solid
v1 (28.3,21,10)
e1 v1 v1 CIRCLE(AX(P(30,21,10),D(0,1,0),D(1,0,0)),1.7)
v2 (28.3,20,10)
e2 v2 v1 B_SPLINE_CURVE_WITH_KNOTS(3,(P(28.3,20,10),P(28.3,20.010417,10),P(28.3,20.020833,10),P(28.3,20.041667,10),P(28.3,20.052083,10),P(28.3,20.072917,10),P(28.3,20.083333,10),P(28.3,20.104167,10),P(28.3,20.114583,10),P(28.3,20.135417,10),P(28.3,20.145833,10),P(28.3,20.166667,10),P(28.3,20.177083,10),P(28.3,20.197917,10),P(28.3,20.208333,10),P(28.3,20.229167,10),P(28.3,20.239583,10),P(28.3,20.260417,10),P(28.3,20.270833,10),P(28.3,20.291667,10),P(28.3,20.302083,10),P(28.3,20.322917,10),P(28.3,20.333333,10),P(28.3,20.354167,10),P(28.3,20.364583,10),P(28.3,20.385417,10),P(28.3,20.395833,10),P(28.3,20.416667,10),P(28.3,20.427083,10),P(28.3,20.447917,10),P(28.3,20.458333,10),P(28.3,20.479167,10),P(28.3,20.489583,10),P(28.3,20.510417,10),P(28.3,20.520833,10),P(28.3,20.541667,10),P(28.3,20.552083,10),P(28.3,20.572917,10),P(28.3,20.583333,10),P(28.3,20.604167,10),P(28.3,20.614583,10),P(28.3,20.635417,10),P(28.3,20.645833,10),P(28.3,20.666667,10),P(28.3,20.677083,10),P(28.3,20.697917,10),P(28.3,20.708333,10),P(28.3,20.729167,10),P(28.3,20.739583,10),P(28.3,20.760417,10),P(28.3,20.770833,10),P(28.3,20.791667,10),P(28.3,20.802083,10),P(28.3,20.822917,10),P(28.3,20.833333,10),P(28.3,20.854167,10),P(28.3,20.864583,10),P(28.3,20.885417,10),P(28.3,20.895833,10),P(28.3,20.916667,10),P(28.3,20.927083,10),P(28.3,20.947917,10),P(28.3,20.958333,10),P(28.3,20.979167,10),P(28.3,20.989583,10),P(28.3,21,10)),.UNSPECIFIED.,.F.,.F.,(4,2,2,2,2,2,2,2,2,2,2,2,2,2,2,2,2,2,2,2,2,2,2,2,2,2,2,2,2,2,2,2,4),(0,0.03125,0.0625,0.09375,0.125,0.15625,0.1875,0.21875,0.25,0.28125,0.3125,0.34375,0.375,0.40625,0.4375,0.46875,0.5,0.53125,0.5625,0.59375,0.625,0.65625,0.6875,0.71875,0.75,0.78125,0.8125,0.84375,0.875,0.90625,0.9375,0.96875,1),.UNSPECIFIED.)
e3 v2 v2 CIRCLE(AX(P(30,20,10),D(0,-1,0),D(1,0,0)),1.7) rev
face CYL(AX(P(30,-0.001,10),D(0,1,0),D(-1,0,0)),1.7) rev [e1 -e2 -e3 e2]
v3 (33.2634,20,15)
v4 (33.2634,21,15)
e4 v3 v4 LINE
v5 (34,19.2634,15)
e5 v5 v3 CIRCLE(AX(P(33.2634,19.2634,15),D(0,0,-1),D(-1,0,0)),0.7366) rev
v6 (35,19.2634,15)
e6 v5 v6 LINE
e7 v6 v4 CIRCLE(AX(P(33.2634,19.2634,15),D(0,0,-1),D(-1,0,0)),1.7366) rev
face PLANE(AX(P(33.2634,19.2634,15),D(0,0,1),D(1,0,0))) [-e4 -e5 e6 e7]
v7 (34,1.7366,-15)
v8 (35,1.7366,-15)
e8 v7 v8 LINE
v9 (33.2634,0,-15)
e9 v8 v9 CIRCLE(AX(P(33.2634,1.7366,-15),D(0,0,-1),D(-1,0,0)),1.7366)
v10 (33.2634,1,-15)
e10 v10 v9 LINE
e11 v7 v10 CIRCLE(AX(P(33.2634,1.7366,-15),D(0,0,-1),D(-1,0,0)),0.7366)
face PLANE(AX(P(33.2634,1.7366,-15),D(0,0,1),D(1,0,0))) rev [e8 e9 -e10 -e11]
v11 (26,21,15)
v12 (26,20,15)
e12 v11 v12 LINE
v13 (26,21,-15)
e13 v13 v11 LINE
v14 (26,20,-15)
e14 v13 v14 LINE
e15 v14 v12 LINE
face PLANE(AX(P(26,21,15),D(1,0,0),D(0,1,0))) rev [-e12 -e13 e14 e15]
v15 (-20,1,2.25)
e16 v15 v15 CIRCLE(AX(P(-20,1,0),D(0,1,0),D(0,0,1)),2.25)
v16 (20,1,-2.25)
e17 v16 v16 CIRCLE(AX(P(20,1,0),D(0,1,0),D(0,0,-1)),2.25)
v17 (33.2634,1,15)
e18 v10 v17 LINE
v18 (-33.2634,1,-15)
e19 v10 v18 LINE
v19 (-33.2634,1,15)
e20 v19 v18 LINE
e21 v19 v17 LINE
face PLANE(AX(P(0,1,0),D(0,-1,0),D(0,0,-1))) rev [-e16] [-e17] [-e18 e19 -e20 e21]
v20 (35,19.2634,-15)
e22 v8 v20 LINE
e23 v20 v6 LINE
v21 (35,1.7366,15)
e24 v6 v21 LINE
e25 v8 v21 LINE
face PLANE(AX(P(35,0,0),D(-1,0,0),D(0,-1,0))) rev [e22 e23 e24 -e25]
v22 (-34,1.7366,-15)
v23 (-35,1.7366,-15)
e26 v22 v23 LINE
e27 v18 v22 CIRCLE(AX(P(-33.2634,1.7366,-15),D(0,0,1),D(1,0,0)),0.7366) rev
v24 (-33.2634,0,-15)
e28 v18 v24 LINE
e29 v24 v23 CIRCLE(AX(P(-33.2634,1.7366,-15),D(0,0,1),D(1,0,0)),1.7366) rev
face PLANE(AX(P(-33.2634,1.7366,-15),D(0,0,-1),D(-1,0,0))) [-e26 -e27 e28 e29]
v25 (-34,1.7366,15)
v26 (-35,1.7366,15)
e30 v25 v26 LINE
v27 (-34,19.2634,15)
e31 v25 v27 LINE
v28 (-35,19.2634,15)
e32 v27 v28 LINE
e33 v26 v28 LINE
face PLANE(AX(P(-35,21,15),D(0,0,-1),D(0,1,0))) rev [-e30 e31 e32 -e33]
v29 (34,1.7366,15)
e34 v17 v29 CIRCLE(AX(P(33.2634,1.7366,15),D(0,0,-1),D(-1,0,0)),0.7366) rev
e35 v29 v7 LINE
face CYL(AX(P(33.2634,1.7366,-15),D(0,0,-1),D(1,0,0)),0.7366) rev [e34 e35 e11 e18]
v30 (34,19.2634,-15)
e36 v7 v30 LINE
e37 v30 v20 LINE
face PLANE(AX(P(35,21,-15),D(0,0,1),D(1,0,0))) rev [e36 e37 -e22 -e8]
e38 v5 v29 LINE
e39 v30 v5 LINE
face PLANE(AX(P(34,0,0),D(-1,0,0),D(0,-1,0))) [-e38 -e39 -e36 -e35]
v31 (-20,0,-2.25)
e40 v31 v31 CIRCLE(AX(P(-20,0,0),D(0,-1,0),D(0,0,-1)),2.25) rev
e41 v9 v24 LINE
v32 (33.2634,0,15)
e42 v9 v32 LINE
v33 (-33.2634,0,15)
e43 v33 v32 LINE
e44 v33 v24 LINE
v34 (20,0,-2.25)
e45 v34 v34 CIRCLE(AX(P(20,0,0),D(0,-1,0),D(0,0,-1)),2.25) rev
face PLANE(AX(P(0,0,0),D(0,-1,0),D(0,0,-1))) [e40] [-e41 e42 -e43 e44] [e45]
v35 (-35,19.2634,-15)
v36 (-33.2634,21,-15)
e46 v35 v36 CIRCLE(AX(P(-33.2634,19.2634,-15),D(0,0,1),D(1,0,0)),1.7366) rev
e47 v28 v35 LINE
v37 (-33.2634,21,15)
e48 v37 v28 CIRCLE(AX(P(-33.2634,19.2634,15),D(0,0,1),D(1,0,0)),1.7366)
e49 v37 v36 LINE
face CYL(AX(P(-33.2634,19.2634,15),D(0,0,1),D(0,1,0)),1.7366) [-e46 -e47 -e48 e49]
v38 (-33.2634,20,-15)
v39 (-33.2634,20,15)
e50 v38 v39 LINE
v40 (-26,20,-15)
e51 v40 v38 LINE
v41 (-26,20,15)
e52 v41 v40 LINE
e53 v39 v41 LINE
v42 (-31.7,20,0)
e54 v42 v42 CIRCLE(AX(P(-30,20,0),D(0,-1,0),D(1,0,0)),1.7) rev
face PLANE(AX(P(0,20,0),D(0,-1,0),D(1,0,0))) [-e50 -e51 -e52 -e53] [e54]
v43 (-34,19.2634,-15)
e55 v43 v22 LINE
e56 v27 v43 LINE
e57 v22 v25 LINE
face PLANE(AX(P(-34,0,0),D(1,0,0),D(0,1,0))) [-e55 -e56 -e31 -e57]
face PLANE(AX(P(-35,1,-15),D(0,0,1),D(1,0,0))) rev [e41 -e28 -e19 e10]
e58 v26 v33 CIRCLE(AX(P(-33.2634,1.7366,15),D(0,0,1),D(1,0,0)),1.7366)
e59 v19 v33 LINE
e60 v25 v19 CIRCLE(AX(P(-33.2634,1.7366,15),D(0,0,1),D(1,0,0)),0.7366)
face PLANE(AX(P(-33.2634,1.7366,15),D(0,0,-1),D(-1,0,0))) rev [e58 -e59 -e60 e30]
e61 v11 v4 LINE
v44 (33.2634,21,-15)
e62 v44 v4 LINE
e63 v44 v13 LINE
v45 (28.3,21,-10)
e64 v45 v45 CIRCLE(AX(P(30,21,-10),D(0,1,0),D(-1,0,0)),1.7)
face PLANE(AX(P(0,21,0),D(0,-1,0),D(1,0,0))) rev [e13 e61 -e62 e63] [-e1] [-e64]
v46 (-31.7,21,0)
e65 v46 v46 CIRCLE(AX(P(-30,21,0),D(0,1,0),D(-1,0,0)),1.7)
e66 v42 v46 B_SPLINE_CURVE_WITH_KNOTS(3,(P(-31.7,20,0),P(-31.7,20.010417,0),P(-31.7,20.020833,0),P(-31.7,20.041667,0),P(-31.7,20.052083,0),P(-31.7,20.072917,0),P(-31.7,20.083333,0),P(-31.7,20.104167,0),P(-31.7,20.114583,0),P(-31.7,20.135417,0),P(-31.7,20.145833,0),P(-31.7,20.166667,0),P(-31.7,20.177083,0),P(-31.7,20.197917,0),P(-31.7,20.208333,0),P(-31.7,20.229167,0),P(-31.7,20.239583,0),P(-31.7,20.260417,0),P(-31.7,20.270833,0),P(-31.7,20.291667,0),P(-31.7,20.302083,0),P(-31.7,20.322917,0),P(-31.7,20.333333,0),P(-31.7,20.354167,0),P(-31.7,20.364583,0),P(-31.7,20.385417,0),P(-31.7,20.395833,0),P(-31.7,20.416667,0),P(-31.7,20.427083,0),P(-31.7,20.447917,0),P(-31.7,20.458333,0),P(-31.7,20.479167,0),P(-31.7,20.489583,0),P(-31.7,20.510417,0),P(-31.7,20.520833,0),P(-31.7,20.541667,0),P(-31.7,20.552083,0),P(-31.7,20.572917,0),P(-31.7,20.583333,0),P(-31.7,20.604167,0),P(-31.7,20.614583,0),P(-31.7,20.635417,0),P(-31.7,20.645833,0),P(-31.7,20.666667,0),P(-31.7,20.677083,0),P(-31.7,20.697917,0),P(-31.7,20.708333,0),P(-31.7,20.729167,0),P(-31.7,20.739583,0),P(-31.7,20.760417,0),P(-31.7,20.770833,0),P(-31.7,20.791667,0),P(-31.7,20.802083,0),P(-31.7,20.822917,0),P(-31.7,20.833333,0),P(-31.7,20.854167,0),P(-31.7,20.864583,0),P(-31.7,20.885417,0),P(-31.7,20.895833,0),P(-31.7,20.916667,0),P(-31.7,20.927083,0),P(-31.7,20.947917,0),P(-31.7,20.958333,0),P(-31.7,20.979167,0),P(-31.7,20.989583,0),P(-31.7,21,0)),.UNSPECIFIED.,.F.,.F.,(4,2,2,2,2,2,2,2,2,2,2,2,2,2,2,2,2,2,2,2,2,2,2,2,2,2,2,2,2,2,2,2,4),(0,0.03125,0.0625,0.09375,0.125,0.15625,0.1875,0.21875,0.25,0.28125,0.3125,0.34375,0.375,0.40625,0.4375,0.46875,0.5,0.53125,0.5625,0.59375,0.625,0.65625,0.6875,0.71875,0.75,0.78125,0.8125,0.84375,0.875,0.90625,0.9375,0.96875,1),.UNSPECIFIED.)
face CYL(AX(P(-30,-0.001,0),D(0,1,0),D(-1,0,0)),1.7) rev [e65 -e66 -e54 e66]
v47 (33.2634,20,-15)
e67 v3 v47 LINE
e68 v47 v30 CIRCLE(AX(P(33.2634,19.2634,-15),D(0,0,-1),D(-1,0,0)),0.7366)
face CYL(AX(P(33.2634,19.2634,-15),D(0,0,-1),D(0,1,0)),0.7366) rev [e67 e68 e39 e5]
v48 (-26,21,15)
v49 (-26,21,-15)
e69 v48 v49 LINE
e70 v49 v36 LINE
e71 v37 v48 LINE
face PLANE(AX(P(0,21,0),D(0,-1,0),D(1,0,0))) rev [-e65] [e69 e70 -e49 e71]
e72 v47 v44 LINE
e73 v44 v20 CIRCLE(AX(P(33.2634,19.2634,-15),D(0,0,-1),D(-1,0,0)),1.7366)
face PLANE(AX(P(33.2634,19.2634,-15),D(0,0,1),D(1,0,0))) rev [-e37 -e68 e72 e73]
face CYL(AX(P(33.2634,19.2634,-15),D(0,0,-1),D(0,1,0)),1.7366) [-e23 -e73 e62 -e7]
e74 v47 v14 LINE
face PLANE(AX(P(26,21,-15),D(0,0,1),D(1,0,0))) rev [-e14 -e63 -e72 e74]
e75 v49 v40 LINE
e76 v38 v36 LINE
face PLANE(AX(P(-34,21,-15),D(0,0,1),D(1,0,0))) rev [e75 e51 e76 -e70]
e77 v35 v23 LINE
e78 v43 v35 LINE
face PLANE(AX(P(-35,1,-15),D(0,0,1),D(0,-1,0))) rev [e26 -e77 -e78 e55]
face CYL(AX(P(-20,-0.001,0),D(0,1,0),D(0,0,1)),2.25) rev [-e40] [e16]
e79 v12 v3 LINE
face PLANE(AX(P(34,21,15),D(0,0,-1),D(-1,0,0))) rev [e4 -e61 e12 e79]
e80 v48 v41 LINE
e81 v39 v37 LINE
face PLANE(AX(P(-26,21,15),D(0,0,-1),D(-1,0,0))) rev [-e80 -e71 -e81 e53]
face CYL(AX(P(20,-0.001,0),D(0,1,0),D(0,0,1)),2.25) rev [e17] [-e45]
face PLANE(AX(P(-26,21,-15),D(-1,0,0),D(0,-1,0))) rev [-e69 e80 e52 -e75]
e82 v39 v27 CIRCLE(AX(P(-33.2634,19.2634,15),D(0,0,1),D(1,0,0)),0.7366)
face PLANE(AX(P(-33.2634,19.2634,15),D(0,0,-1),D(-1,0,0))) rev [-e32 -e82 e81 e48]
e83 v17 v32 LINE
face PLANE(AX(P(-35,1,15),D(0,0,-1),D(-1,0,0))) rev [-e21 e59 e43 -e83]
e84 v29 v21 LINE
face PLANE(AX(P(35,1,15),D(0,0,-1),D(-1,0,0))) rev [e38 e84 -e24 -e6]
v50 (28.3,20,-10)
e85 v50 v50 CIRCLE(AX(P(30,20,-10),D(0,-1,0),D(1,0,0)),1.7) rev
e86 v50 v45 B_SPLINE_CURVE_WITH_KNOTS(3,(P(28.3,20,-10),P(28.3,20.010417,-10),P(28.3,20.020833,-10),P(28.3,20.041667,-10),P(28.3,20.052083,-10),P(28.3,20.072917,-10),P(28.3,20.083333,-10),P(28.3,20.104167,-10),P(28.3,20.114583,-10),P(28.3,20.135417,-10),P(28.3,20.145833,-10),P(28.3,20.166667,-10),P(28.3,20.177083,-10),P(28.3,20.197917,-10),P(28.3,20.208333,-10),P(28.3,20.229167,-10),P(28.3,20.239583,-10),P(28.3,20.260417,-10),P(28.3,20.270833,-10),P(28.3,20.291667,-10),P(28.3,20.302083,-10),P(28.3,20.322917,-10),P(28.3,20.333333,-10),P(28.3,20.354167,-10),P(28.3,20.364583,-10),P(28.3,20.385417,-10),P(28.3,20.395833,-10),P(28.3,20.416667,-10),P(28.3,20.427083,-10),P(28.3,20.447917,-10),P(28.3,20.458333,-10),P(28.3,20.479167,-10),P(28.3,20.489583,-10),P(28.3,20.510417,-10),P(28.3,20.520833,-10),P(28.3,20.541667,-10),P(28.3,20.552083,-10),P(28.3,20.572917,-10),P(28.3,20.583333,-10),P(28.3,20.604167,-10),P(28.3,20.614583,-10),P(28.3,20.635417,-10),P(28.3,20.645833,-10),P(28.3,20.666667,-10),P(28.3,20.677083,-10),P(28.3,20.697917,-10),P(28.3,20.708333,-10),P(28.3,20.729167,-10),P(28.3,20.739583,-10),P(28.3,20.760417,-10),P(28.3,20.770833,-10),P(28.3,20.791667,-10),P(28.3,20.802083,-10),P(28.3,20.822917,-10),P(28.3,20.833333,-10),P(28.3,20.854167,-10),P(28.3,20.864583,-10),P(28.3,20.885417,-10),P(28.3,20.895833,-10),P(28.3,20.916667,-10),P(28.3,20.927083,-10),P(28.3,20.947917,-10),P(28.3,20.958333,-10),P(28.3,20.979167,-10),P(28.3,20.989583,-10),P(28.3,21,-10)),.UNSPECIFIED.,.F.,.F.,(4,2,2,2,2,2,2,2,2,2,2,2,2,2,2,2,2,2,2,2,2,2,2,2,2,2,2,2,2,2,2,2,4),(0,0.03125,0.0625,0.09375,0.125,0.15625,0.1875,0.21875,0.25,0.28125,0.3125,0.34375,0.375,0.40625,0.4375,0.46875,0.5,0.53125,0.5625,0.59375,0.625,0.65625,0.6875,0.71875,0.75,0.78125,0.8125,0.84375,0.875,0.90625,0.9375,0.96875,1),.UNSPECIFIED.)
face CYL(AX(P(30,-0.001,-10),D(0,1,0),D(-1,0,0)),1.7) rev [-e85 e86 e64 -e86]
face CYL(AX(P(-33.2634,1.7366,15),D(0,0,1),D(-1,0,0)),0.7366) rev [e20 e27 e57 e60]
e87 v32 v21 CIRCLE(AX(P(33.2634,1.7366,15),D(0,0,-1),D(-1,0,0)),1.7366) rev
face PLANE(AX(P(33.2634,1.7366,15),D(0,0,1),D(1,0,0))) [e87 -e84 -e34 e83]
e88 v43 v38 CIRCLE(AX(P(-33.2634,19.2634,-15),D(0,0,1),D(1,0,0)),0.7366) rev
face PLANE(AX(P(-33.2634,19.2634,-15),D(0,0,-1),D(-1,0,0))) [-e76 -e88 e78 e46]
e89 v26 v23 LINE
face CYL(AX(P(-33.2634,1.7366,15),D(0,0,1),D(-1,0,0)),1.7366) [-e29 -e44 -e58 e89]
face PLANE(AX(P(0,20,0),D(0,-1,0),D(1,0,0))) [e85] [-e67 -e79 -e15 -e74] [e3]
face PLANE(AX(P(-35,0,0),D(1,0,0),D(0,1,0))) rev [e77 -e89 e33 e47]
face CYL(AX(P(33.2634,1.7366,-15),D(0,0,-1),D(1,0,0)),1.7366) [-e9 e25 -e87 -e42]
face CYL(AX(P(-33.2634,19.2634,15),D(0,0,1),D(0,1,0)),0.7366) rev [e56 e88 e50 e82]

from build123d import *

# Parameters (mm, degrees)
ESQUISSE1_W                             = 70
ESQUISSE1_H                             = 30
T_LE_DE_BASE_PLI_E1_DEPTH               = 1
T_LE_PLI_E_SUR_AR_TE1_STRIP_W           = 5.4732
T_LE_PLI_E_SUR_AR_TE1_STRIP_H           = 1
T_LE_PLI_E_SUR_AR_TE1_STRIP_CUT_DEPTH   = 30
T_LE_PLI_E_SUR_AR_TE1_STRIP_2_W         = 5.4732
T_LE_PLI_E_SUR_AR_TE1_STRIP_2_H         = 1
T_LE_PLI_E_SUR_AR_TE1_STRIP_CUT_2_DEPTH = 30
T_LE_PLI_E_SUR_AR_TE1_DEPTH             = 30
T_LE_PLI_E_SUR_AR_TE1_BEND_DEPTH        = 30
T_LE_PLI_E_SUR_AR_TE2_STRIP_W           = 5.4732
T_LE_PLI_E_SUR_AR_TE2_STRIP_H           = 1
T_LE_PLI_E_SUR_AR_TE2_STRIP_CUT_DEPTH   = 30
T_LE_PLI_E_SUR_AR_TE2_STRIP_2_W         = 5.4732
T_LE_PLI_E_SUR_AR_TE2_STRIP_2_H         = 1
T_LE_PLI_E_SUR_AR_TE2_STRIP_CUT_2_DEPTH = 30
T_LE_PLI_E_SUR_AR_TE2_DEPTH             = 30
T_LE_PLI_E_SUR_AR_TE2_BEND_DEPTH        = 30
ENL_V_MAT_EXTRU_1_REACH                 = 45.486
ESQUISSE12_R                            = 1.7
ENL_V_MAT_EXTRU_3_REACH                 = 45.012
ESQUISSE27_R                            = 2.25


# Sheet-metal steps are written as plain solids
with BuildPart() as part:
    # Esquisse1 → Tôle de base pliée1 (new body)
    with BuildSketch(Plane(origin=(0, 0, 0), x_dir=(1, 0, 0), z_dir=(0, 1, 0))):
        Rectangle(ESQUISSE1_W, ESQUISSE1_H)
    extrude(amount=T_LE_DE_BASE_PLI_E1_DEPTH)

    # Tôle pliée sur arête1 strip (across the edge) → Tôle pliée sur arête1 strip cut (cut)
    with BuildSketch(Plane(origin=(-35, 1, -15), x_dir=(1, 0, 0), z_dir=(0, 0, 1))):
        with Locations((-1, -0.5)):
            Rectangle(T_LE_PLI_E_SUR_AR_TE1_STRIP_W, T_LE_PLI_E_SUR_AR_TE1_STRIP_H)
    extrude(amount=T_LE_PLI_E_SUR_AR_TE1_STRIP_CUT_DEPTH, mode=Mode.SUBTRACT)

    # Tôle pliée sur arête1 strip 2 (across the edge) → Tôle pliée sur arête1 strip cut 2 (cut)
    with BuildSketch(Plane(origin=(35, 1, 15), x_dir=(-1, 0, 0), z_dir=(0, 0, -1))):
        with Locations((-1, -0.5)):
            Rectangle(T_LE_PLI_E_SUR_AR_TE1_STRIP_2_W, T_LE_PLI_E_SUR_AR_TE1_STRIP_2_H)
    extrude(amount=T_LE_PLI_E_SUR_AR_TE1_STRIP_CUT_2_DEPTH, mode=Mode.SUBTRACT)

    # Tôle pliée sur arête1 section (across the edge) → Tôle pliée sur arête1 (add)
    with BuildSketch(Plane(origin=(-35, 1, -15), x_dir=(1, 0, 0), z_dir=(0, 0, 1))):
        with BuildLine():
            Line((0, 0.7366), (0, 20))
            Line((0, 20), (1, 20))
            Line((1, 20), (1, 0.7366))
            ThreePointArc((1, 0.7366), (1.215745145, 0.215745145), (1.7366, 0))
            Line((1.7366, 0), (1.7366, -1))
            ThreePointArc((1.7366, -1), (0.508638364, -0.491361636), (0, 0.7366))
        make_face()
    extrude(amount=T_LE_PLI_E_SUR_AR_TE1_DEPTH)

    # Tôle pliée sur arête1 section 2 (across the edge) → Tôle pliée sur arête1 bend (add)
    with BuildSketch(Plane(origin=(35, 1, 15), x_dir=(-1, 0, 0), z_dir=(0, 0, -1))):
        with BuildLine():
            Line((0, 0.7366), (0, 20))
            Line((0, 20), (1, 20))
            Line((1, 20), (1, 0.7366))
            ThreePointArc((1, 0.7366), (1.215745145, 0.215745145), (1.7366, 0))
            Line((1.7366, 0), (1.7366, -1))
            ThreePointArc((1.7366, -1), (0.508638364, -0.491361636), (0, 0.7366))
        make_face()
    extrude(amount=T_LE_PLI_E_SUR_AR_TE1_BEND_DEPTH)

    # Tôle pliée sur arête2 strip (across the edge) → Tôle pliée sur arête2 strip cut (cut)
    with BuildSketch(Plane(origin=(-34, 21, -15), x_dir=(0, -1, 0), z_dir=(0, 0, 1))):
        with Locations((-1, -0.5)):
            Rectangle(T_LE_PLI_E_SUR_AR_TE2_STRIP_W, T_LE_PLI_E_SUR_AR_TE2_STRIP_H)
    extrude(amount=T_LE_PLI_E_SUR_AR_TE2_STRIP_CUT_DEPTH, mode=Mode.SUBTRACT)

    # Tôle pliée sur arête2 strip 2 (across the edge) → Tôle pliée sur arête2 strip cut 2 (cut)
    with BuildSketch(Plane(origin=(34, 21, 15), x_dir=(0, -1, 0), z_dir=(0, 0, -1))):
        with Locations((-1, -0.5)):
            Rectangle(T_LE_PLI_E_SUR_AR_TE2_STRIP_2_W, T_LE_PLI_E_SUR_AR_TE2_STRIP_2_H)
    extrude(amount=T_LE_PLI_E_SUR_AR_TE2_STRIP_CUT_2_DEPTH, mode=Mode.SUBTRACT)

    # Tôle pliée sur arête2 section (across the edge) → Tôle pliée sur arête2 (add)
    with BuildSketch(Plane(origin=(-34, 21, -15), x_dir=(0, -1, 0), z_dir=(0, 0, 1))):
        with BuildLine():
            Line((0, 0.7366), (0, 8))
            Line((0, 8), (1, 8))
            Line((1, 8), (1, 0.7366))
            ThreePointArc((1, 0.7366), (1.215745145, 0.215745145), (1.7366, 0))
            Line((1.7366, 0), (1.7366, -1))
            ThreePointArc((1.7366, -1), (0.508638364, -0.491361636), (0, 0.7366))
        make_face()
    extrude(amount=T_LE_PLI_E_SUR_AR_TE2_DEPTH)

    # Tôle pliée sur arête2 section 2 (across the edge) → Tôle pliée sur arête2 bend (add)
    with BuildSketch(Plane(origin=(34, 21, 15), x_dir=(0, -1, 0), z_dir=(0, 0, -1))):
        with BuildLine():
            Line((0, 0.7366), (0, 8))
            Line((0, 8), (1, 8))
            Line((1, 8), (1, 0.7366))
            ThreePointArc((1, 0.7366), (1.215745145, 0.215745145), (1.7366, 0))
            Line((1.7366, 0), (1.7366, -1))
            ThreePointArc((1.7366, -1), (0.508638364, -0.491361636), (0, 0.7366))
        make_face()
    extrude(amount=T_LE_PLI_E_SUR_AR_TE2_BEND_DEPTH)

    # Esquisse12 → Enlèv. mat.-Extru.1 (cut, up to next)
    with BuildSketch(Plane(origin=(0, 21, 0), x_dir=(1, 0, 0), z_dir=(0, 1, 0)), mode=Mode.PRIVATE) as enl_v_mat_extru_1_sk1:
        with Locations(Location((-30, 0, 0), (0, 0, 180))):
            Circle(ESQUISSE12_R)
    enl_v_mat_extru_1_tool1 = extrude(enl_v_mat_extru_1_sk1.sketch, amount=-ENL_V_MAT_EXTRU_1_REACH, mode=Mode.PRIVATE) & part.part
    # Esquisse12 → Enlèv. mat.-Extru.1 (cut, up to next)
    with BuildSketch(Plane(origin=(0, 21, 0), x_dir=(1, 0, 0), z_dir=(0, 1, 0)), mode=Mode.PRIVATE) as enl_v_mat_extru_1_sk2:
        with Locations(Location((30, 10, 0), (0, 0, 180))):
            Circle(ESQUISSE12_R)
    enl_v_mat_extru_1_tool2 = extrude(enl_v_mat_extru_1_sk2.sketch, amount=-ENL_V_MAT_EXTRU_1_REACH, mode=Mode.PRIVATE) & part.part
    # Esquisse12 → Enlèv. mat.-Extru.1 (cut, up to next)
    with BuildSketch(Plane(origin=(0, 21, 0), x_dir=(1, 0, 0), z_dir=(0, 1, 0)), mode=Mode.PRIVATE) as enl_v_mat_extru_1_sk3:
        with Locations(Location((30, -10, 0), (0, 0, 180))):
            Circle(ESQUISSE12_R)
    enl_v_mat_extru_1_tool3 = extrude(enl_v_mat_extru_1_sk3.sketch, amount=-ENL_V_MAT_EXTRU_1_REACH, mode=Mode.PRIVATE) & part.part
    add(enl_v_mat_extru_1_tool1.solids().sort_by_distance((-30, 21, 0))[0], mode=Mode.SUBTRACT)
    add(enl_v_mat_extru_1_tool2.solids().sort_by_distance((30, 21, -10))[0], mode=Mode.SUBTRACT)
    add(enl_v_mat_extru_1_tool3.solids().sort_by_distance((30, 21, 10))[0], mode=Mode.SUBTRACT)

    # Esquisse27 → Enlèv. mat.-Extru.3 (cut, up to next)
    with BuildSketch(Plane(origin=(0, 1, 0), x_dir=(1, 0, 0), z_dir=(0, 1, 0)), mode=Mode.PRIVATE) as enl_v_mat_extru_3_sk1:
        with Locations(Location((-20, 0, 0), (0, 0, 270))):
            Circle(ESQUISSE27_R)
    enl_v_mat_extru_3_tool1 = extrude(enl_v_mat_extru_3_sk1.sketch, amount=-ENL_V_MAT_EXTRU_3_REACH, mode=Mode.PRIVATE) & part.part
    # Esquisse27 → Enlèv. mat.-Extru.3 (cut, up to next)
    with BuildSketch(Plane(origin=(0, 1, 0), x_dir=(1, 0, 0), z_dir=(0, 1, 0)), mode=Mode.PRIVATE) as enl_v_mat_extru_3_sk2:
        with Locations(Location((20, 0, 0), (0, 0, 90))):
            Circle(ESQUISSE27_R)
    enl_v_mat_extru_3_tool2 = extrude(enl_v_mat_extru_3_sk2.sketch, amount=-ENL_V_MAT_EXTRU_3_REACH, mode=Mode.PRIVATE) & part.part
    add(enl_v_mat_extru_3_tool1.solids().sort_by_distance((-20, 1, 0))[0], mode=Mode.SUBTRACT)
    add(enl_v_mat_extru_3_tool2.solids().sort_by_distance((20, 1, 0))[0], mode=Mode.SUBTRACT)


solid = part.part
